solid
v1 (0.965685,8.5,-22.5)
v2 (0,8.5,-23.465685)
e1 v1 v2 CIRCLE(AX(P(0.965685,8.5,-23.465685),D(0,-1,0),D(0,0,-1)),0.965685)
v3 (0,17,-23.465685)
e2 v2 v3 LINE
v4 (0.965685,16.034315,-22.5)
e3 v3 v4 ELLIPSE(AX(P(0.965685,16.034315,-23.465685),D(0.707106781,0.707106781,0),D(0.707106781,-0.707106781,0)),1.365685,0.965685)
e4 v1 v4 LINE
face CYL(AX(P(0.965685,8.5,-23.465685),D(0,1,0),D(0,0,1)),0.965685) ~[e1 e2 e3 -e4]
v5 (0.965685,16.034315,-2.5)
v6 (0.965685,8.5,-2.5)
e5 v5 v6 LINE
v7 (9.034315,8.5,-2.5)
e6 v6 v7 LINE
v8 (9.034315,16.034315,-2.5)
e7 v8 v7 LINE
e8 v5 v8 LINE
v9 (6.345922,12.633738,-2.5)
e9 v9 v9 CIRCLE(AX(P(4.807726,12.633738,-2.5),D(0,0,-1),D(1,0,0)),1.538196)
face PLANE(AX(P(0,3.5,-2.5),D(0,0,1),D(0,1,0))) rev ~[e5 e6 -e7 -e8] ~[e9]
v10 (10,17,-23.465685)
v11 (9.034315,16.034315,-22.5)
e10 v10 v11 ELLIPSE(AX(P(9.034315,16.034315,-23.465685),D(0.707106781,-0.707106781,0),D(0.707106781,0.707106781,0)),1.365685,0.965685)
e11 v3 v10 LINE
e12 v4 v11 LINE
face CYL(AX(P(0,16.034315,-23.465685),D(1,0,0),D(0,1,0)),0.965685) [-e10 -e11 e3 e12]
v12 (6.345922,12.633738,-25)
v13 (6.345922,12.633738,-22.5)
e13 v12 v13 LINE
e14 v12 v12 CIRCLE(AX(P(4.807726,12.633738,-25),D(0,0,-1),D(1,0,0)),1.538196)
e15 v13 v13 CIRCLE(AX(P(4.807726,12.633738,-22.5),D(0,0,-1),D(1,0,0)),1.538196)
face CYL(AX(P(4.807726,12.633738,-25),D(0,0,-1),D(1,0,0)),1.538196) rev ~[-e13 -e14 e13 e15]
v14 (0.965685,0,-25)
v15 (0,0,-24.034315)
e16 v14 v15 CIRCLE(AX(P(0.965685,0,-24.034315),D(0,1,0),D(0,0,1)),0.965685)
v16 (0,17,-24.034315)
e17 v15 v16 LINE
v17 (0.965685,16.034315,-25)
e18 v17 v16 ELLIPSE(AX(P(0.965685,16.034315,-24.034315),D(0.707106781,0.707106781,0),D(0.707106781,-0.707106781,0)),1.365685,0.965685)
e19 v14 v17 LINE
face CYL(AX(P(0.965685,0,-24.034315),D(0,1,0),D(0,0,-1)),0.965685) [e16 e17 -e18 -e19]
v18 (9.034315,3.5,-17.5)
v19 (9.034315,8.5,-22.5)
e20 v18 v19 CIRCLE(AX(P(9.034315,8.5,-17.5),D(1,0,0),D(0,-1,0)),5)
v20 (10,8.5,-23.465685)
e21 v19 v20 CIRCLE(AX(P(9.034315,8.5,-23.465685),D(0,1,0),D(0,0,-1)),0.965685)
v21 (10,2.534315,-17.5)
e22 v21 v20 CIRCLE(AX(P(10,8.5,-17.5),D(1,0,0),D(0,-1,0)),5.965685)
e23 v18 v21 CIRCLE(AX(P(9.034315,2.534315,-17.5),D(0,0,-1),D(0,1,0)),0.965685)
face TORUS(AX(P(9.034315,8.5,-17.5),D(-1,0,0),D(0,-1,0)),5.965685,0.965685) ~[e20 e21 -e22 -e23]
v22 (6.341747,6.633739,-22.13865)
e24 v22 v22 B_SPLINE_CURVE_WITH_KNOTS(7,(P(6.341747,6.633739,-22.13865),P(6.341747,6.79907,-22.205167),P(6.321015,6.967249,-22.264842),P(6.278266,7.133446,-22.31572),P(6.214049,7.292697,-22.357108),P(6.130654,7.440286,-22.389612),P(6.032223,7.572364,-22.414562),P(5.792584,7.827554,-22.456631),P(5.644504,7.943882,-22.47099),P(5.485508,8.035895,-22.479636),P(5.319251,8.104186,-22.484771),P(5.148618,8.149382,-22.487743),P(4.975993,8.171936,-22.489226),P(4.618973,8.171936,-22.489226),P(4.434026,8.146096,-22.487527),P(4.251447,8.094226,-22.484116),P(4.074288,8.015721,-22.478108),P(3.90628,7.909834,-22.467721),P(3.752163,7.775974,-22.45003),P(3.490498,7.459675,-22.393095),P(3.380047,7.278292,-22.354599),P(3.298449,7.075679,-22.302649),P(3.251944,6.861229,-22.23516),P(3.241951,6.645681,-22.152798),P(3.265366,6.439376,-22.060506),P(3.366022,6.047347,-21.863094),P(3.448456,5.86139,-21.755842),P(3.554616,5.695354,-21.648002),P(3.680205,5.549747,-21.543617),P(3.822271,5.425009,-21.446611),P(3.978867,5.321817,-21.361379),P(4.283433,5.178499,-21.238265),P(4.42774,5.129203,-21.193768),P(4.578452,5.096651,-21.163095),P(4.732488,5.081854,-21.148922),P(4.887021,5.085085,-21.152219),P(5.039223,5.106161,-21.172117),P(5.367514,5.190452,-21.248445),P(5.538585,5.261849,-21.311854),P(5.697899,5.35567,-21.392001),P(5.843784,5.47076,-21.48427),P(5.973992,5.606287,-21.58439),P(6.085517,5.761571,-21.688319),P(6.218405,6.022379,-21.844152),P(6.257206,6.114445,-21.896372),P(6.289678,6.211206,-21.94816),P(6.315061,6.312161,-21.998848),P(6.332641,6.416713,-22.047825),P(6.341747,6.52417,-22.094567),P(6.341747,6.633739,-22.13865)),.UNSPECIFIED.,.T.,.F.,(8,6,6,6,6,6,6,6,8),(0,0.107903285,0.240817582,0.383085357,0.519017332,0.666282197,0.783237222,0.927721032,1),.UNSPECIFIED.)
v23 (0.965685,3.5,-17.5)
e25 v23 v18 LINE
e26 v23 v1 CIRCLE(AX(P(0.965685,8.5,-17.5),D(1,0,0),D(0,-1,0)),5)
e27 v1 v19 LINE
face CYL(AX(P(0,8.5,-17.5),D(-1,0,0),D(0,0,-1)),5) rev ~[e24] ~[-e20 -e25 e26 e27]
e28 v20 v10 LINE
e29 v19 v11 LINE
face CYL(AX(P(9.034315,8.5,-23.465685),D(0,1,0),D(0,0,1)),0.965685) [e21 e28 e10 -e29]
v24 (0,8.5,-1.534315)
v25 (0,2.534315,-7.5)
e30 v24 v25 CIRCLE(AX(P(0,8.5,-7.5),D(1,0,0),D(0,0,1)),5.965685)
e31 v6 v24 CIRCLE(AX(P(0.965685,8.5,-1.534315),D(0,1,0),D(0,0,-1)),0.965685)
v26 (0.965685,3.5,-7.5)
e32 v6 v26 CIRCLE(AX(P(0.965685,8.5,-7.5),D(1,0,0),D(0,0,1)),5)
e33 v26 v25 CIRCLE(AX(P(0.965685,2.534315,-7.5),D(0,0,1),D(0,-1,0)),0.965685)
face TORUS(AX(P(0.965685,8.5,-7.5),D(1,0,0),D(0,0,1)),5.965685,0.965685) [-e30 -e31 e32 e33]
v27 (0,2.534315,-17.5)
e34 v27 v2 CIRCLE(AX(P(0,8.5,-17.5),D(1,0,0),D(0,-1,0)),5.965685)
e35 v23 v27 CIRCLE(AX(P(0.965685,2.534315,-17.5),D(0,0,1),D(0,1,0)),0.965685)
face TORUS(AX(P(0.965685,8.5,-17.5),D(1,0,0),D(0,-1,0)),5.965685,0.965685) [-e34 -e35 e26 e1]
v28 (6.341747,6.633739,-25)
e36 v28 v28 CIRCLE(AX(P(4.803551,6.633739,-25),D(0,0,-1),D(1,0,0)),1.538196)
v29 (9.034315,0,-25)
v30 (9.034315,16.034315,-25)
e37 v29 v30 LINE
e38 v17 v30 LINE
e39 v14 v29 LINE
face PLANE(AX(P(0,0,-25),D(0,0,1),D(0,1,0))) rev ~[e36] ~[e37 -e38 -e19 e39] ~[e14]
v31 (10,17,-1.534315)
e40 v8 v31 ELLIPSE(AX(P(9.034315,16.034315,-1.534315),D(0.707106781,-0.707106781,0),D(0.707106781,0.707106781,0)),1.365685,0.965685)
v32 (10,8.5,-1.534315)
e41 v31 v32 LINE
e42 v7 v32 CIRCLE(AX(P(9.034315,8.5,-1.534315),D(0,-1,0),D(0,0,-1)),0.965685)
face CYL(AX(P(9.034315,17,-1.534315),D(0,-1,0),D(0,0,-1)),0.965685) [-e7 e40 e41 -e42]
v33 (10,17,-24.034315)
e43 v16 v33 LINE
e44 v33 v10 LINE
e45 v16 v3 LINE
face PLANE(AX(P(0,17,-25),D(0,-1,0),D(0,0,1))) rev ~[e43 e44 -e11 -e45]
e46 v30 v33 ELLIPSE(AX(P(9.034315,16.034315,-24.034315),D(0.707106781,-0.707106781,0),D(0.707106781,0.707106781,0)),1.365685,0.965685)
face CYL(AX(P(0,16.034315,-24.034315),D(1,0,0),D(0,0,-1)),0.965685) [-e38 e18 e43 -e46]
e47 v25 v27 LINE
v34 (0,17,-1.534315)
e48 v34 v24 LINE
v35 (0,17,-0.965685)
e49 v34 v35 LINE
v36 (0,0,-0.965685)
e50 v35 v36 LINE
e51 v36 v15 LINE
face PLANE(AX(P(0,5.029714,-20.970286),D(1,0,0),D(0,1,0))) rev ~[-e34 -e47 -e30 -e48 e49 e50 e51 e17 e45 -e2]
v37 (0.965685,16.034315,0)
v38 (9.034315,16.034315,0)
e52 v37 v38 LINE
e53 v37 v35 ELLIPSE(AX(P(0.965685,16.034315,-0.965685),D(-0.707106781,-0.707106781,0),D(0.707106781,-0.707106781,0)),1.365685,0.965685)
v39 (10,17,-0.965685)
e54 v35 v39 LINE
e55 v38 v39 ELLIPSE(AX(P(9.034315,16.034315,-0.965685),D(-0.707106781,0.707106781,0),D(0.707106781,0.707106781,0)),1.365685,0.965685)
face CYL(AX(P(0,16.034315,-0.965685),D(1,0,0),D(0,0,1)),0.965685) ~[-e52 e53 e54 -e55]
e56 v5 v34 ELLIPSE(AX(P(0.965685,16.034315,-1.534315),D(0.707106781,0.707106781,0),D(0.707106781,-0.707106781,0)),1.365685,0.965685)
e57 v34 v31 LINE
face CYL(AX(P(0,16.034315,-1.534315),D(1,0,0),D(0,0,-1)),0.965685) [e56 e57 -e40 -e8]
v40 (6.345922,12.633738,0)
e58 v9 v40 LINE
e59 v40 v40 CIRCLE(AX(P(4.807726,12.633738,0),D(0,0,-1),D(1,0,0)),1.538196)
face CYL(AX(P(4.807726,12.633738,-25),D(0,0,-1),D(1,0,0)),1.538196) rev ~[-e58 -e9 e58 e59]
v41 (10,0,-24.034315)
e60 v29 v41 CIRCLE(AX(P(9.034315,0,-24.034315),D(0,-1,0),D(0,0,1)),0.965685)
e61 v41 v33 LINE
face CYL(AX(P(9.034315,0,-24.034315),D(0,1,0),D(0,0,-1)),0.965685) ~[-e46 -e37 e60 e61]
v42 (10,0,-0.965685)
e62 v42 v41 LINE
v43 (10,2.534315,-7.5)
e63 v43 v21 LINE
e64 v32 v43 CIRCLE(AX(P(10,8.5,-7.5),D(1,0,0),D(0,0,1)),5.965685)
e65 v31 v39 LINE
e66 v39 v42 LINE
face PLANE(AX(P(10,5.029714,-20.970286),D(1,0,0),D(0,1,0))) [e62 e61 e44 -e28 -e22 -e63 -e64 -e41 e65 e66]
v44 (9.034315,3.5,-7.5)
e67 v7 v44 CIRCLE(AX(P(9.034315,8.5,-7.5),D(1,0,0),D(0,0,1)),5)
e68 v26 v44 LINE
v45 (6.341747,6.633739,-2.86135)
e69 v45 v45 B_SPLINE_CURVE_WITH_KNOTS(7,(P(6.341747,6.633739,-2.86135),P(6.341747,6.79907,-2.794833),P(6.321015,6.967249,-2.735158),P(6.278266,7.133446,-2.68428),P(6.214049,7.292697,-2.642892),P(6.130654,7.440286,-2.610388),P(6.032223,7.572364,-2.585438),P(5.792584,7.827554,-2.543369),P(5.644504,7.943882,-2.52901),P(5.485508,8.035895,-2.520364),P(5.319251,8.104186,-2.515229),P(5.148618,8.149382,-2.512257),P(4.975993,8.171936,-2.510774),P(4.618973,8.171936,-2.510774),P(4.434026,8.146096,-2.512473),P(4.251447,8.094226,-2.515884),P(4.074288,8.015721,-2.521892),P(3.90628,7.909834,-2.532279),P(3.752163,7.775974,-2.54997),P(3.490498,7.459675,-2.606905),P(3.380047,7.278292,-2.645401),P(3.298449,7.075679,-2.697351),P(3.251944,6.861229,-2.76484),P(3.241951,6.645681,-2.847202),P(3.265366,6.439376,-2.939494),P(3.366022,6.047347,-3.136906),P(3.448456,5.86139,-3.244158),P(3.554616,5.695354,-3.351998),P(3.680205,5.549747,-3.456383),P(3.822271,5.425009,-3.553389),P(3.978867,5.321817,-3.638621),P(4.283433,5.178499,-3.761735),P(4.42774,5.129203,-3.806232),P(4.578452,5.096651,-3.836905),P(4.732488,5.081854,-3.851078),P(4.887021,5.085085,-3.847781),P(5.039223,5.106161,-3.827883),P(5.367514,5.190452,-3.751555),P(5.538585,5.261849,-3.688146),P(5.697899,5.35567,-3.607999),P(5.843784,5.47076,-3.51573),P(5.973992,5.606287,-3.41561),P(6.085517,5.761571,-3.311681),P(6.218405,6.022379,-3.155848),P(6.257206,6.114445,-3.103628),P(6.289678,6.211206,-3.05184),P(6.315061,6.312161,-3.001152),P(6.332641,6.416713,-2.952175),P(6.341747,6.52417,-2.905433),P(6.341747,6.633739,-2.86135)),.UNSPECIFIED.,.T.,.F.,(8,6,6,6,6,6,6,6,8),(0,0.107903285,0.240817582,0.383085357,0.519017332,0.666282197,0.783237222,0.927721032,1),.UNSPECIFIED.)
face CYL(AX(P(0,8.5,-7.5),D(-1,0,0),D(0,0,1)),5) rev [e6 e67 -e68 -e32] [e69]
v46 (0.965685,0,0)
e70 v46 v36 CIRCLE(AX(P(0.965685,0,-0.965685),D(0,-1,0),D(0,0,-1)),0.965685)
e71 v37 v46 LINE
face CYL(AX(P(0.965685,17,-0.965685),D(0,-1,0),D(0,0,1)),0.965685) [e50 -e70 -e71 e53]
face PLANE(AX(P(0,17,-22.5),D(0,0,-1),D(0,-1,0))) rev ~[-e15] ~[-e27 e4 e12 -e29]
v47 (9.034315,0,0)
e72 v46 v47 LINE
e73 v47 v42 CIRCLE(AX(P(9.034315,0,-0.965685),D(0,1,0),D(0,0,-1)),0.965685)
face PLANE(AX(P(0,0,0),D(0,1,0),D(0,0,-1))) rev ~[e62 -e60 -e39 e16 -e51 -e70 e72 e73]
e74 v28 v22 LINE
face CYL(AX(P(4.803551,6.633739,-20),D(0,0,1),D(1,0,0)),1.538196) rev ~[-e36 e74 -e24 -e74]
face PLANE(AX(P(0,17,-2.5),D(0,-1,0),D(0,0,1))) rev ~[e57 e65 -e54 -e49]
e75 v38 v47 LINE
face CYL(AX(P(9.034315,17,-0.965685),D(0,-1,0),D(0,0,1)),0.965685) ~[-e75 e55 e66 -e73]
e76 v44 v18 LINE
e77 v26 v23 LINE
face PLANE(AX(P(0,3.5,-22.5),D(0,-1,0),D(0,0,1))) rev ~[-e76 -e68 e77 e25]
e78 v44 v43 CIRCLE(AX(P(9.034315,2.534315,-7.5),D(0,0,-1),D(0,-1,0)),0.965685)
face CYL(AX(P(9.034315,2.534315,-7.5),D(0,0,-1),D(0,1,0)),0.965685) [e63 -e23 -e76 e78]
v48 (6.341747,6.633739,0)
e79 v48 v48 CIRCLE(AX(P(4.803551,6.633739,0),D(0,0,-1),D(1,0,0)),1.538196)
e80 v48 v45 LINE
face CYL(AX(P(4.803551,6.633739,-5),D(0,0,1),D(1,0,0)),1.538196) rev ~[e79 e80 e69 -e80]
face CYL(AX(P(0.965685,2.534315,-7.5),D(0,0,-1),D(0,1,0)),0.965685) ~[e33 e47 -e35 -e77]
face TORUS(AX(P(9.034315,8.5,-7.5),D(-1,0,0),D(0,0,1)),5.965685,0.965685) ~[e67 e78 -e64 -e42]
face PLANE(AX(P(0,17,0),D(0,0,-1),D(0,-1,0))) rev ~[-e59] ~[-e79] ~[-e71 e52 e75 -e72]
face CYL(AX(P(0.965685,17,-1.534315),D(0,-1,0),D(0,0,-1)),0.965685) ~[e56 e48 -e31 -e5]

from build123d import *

# Parameters (mm, degrees)
F1_DEPTH     = 10
F2_R         = 1.538196108
F3_DEPTH     = 25
F4_T4_DEPTH  = 10
F4_S5_R      = 1.538196108
F4_T6_DEPTH  = 8
F4_T10_DEPTH = 10
F4_S11_R     = 1.538196108
F4_T12_DEPTH = 8
F5_R         = 0.9656854249


# Not quite as in the source:
# - a fillet or chamfer that OpenCascade refuses, or shapes differently, is made with other operations: its cross-section is extruded or revolved along the edge and cut away or added


with BuildPart() as f1:
    # F0 (on Right) → F1 (new body)
    with BuildSketch(Plane.YZ):
        Polygon((17, 0), (0, 0), (0, -25), (17, -25), (17, -22.5), (3.5, -22.5), (3.5, -2.5), (17, -2.5), align=None)
    extrude(amount=F1_DEPTH)

    # F2 (on face) → F3 (cut)
    with BuildSketch(Plane(origin=(0, 0, -25), x_dir=(1, 0, 0), z_dir=(0, 0, -1))):
        with Locations((4.8035508953, -6.6337394528)):
            Circle(F2_R)
        with Locations((4.8077256637, -12.6337380004)):
            Circle(F2_R)
    extrude(amount=-F3_DEPTH, mode=Mode.SUBTRACT)

    # F4: fillet of radius 5 on 2 edges, made by hand


with BuildPart() as f4_tool2:
    # F4_s3 → F4_t4 (new body)
    with BuildSketch(Plane.YZ):
        with BuildLine():
            ThreePointArc((8.5, -2.5), (4.9644660941, -3.9644660941), (3.5, -7.5))
            Line((3.5, -7.5), (3.5, -2.5))
            Line((3.5, -2.5), (8.5, -2.5))
        make_face()
    extrude(amount=F4_T4_DEPTH)

    # F4_s5 → F4_t6 (cut, symmetric)
    with BuildSketch(Plane.XY.offset(-5)):
        with Locations((4.8035508953, 6.6337394528)):
            Circle(F4_S5_R)
    extrude(amount=F4_T6_DEPTH, both=True, mode=Mode.SUBTRACT)


with BuildPart() as f1_1:
    add(f1.part)

    # F4_t1: union F4_tool2
    add(f4_tool2.part)


with BuildPart() as f4_tool8:
    # F4_s9 → F4_t10 (new body)
    with BuildSketch(Plane.YZ):
        with BuildLine():
            ThreePointArc((8.5, -22.5), (4.9644660941, -21.0355339059), (3.5, -17.5))
            Line((3.5, -17.5), (3.5, -22.5))
            Line((3.5, -22.5), (8.5, -22.5))
        make_face()
    extrude(amount=F4_T10_DEPTH)

    # F4_s11 → F4_t12 (cut, symmetric)
    with BuildSketch(Plane.XY.offset(-20)):
        with Locations((4.8035508953, 6.6337394528)):
            Circle(F4_S11_R)
    extrude(amount=F4_T12_DEPTH, both=True, mode=Mode.SUBTRACT)


with BuildPart() as f1_2:
    add(f1_1.part)

    # F4_t7: union F4_tool8
    add(f4_tool8.part)

    # F5
    f5_edges = [f1_2.edges().sort_by_distance(p)[0] for p in [
        (5, 17, -22.5),
        (5, 17, -25),
        (5, 17, 0),
        (5, 17, -2.5),
        (0, 8.5, 0),
        (10, 8.5, 0),
        (10, 8.5, -25),
        (0, 8.5, -25),
        (10, 4.964466, -3.964466),
        (0, 4.964466, -3.964466),
        (0, 3.5, -12.5),
    ]]
    fillet(f5_edges, radius=F5_R)


solid = f1_2.part
